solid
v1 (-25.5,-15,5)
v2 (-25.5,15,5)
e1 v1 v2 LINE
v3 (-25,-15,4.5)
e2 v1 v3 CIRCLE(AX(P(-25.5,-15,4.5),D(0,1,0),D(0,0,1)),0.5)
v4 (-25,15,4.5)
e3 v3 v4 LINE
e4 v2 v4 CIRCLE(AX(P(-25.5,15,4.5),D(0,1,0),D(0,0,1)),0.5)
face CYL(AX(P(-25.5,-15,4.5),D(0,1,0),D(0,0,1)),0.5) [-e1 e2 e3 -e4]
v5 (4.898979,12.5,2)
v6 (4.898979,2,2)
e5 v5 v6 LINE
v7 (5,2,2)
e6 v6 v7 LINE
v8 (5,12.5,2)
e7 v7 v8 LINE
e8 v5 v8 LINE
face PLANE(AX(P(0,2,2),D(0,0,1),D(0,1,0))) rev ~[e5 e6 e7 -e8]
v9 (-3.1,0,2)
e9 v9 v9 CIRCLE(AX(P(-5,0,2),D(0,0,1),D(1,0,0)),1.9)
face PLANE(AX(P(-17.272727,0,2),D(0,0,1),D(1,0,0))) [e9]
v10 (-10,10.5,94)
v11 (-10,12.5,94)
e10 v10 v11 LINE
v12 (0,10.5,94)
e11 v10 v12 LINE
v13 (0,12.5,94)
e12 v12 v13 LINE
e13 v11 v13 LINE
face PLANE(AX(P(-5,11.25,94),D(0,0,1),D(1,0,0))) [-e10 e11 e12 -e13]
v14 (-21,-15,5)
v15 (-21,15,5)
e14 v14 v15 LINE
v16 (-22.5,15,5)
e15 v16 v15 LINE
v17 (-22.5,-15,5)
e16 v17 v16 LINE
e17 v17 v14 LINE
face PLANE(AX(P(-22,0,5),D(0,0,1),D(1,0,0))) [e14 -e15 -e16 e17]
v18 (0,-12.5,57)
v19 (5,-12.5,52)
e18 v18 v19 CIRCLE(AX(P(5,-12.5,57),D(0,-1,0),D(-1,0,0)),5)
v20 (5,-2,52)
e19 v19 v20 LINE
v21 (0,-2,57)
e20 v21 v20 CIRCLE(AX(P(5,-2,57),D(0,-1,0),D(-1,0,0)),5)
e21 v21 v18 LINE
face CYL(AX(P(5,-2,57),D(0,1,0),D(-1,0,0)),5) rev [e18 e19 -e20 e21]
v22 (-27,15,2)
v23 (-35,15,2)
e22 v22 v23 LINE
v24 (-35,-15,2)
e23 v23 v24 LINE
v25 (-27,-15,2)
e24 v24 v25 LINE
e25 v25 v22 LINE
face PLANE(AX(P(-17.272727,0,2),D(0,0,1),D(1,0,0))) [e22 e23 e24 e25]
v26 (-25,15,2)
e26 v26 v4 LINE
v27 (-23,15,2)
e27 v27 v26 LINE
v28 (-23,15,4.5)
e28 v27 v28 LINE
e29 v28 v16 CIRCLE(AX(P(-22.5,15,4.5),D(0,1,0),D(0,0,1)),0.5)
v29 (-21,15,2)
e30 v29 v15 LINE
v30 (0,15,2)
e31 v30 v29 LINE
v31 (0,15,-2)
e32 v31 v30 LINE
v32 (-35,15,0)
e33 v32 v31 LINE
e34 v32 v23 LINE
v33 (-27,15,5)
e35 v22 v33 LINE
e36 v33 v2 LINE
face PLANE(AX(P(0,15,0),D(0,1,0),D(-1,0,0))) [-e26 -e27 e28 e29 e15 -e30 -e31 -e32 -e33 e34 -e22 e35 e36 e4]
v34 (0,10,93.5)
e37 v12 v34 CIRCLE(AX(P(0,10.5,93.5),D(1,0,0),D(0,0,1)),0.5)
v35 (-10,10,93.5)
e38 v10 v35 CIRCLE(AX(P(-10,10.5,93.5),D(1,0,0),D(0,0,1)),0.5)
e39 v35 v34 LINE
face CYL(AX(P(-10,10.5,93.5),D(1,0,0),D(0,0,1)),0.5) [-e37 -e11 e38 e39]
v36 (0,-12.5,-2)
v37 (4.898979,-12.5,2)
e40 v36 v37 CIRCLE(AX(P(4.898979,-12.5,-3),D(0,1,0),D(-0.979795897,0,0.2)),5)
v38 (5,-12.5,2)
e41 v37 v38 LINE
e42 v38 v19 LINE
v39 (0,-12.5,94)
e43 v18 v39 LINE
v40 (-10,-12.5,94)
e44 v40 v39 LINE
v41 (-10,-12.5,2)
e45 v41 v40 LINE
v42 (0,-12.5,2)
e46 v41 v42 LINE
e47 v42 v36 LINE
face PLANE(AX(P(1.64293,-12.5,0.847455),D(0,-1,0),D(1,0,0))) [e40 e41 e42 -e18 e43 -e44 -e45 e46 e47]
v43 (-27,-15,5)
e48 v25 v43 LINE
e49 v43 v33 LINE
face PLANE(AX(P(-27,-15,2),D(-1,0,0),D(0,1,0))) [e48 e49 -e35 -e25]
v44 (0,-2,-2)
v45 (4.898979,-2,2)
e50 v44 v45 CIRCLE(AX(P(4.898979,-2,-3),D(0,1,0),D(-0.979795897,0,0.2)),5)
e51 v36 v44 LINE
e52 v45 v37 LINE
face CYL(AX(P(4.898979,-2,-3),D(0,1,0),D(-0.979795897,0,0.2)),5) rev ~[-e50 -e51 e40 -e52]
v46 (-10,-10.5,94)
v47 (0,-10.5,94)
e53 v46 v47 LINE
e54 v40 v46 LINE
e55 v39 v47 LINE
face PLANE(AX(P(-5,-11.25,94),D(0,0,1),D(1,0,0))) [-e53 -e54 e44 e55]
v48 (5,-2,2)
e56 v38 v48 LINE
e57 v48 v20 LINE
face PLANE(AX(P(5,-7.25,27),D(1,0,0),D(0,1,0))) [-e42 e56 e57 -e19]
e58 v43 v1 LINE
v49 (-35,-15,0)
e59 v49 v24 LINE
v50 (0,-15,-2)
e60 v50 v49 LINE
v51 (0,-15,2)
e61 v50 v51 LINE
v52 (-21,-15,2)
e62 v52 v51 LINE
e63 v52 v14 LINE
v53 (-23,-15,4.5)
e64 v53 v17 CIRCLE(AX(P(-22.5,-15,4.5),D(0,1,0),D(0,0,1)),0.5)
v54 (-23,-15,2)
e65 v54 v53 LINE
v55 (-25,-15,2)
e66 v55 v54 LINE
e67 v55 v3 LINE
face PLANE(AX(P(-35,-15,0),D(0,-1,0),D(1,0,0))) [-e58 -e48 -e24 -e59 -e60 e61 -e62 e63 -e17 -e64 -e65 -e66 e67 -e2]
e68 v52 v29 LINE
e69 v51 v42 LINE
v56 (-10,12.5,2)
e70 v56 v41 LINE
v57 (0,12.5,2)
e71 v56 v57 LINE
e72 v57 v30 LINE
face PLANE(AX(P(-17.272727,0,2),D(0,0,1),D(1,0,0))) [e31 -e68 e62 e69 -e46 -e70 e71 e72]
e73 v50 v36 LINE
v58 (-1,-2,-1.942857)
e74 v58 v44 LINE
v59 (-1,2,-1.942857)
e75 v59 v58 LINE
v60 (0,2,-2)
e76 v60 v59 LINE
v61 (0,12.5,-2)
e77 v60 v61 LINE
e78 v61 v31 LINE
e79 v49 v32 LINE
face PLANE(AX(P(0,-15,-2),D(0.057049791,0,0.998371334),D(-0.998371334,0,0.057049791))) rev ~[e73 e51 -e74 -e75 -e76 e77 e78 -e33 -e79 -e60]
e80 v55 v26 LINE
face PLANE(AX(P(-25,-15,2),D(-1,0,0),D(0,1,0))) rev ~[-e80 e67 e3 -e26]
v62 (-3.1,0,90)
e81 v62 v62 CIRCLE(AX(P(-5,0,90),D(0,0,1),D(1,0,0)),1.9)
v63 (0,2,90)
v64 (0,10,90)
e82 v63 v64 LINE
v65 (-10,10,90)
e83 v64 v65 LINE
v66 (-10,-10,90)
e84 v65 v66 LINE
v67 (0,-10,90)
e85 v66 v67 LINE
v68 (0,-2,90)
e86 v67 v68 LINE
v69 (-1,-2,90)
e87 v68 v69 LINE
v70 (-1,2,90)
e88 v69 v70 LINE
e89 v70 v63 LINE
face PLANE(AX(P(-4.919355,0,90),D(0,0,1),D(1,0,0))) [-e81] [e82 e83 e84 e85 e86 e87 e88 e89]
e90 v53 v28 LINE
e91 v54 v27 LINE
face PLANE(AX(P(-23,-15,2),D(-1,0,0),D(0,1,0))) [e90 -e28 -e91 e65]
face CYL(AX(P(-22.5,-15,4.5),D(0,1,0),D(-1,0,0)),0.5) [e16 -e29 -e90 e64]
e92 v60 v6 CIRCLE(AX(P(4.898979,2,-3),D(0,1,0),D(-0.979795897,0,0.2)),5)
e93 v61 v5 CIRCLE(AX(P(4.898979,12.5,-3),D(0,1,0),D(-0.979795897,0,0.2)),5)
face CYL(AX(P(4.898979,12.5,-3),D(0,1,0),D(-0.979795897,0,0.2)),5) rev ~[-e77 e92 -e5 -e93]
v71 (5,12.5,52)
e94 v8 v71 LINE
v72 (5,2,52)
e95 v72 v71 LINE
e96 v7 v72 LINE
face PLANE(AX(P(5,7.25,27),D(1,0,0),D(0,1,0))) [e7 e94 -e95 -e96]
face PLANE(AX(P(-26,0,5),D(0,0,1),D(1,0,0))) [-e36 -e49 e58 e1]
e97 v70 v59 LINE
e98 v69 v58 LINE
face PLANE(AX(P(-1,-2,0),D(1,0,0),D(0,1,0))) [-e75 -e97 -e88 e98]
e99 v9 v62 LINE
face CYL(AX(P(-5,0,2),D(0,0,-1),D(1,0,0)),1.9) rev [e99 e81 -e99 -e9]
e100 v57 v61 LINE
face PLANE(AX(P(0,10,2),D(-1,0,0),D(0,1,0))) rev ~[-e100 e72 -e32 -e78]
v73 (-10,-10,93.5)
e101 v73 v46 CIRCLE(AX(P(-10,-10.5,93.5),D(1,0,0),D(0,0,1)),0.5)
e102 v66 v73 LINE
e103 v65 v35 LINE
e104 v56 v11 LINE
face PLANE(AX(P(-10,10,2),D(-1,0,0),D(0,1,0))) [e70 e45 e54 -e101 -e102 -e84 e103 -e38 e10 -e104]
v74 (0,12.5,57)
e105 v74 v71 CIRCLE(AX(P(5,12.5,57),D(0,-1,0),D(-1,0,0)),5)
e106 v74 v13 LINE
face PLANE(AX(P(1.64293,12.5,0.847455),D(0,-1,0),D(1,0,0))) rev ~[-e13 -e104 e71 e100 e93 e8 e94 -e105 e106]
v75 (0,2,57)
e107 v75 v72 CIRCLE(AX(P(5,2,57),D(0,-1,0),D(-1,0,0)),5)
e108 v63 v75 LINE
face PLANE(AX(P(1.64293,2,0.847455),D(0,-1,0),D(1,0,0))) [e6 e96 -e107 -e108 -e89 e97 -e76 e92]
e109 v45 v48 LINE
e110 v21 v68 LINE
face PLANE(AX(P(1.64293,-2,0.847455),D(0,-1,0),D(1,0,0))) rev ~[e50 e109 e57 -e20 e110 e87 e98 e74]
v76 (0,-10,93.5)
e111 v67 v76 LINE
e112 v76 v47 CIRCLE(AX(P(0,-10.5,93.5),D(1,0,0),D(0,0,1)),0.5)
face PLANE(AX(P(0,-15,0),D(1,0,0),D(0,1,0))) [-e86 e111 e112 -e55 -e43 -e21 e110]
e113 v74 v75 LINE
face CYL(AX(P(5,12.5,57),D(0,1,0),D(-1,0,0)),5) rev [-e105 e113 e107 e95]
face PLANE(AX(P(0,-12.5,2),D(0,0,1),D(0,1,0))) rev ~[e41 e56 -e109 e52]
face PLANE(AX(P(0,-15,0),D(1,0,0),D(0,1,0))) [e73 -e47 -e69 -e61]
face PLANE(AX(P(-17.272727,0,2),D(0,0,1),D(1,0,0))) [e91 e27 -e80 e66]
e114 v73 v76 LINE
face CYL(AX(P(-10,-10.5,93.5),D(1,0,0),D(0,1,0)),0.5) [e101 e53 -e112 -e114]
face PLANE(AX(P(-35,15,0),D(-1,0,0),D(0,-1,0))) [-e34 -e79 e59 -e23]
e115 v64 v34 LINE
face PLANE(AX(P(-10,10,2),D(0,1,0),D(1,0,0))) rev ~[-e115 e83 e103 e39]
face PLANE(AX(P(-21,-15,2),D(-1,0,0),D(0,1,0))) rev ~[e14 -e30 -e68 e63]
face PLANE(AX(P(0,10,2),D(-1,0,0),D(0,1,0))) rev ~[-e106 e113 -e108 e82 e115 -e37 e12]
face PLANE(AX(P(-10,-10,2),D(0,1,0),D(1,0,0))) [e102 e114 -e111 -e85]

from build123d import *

# Parameters (mm, degrees)
F1_DEPTH      = 2
F2_R          = 1.9
F3_DEPTH      = 88
F4_W          = 2
F4_H          = 30
F5_DEPTH      = 3
F6_DEPTH      = 2
F8_DEPTH      = 30.001
F9_W          = 10
F9_H          = 2.5
F10_DEPTH     = 92
F11_R         = 0.5
F12_W         = 10.5
F12_H         = 50
F13_DEPTH     = 5
F14_T1_DEPTH  = 10.5
F14_T3_DEPTH  = 10.5
F14_T8_DEPTH  = 34.9948974279
F14_T13_DEPTH = 34.9948974279
F14_T18_DEPTH = 35.5
F14_T23_DEPTH = 35.5


# Not quite as in the source:
# - a fillet or chamfer that OpenCascade refuses, or shapes differently, is made with other operations: its cross-section is extruded or revolved along the edge and cut away or added


with BuildPart() as f1:
    # F0 (on Top) → F1 (new body)
    with BuildSketch(Plane.XY):
        Polygon((0, 2), (0, 15), (-35, 15), (-35, -15), (0, -15), (0, -2), (-1, -2), (-1, 2), align=None)
    extrude(amount=F1_DEPTH)

    # F2 (on face) → F3 (join)
    with BuildSketch(Plane.XY.offset(2)):
        Polygon((-1, 2), (0, 2), (0, 10), (-10, 10), (-10, -10), (0, -10), (0, -2), (-1, -2), align=None)
        with Locations((-5, 0)):
            Circle(F2_R, mode=Mode.SUBTRACT)
    extrude(amount=F3_DEPTH)

    # F4 (on face) → F5 (join)
    with BuildSketch(Plane.XY.offset(2)):
        with Locations((-26, 0)):
            Rectangle(F4_W, F4_H)
        with Locations((-22, 0)):
            Rectangle(F4_W, F4_H)
    extrude(amount=F5_DEPTH)

    # F6 (add): a face of the model
    f6_faces = [f1.faces().sort_by_distance(p)[0] for p in [
        (-17.5650095602, 0, 0),
    ]]
    extrude(f6_faces, amount=F6_DEPTH)

    # F7 (on face) → F8 (cut, through all)
    with BuildSketch(Plane.XZ.offset(15)):
        Polygon((0, -2), (-35, 0), (-35, -2), align=None)
    extrude(amount=-F8_DEPTH, mode=Mode.SUBTRACT)

    # F9 (on face) → F10 (join)
    with BuildSketch(Plane.XY.offset(2)):
        with Locations((-5, 11.25)):
            Rectangle(F9_W, F9_H)
        with Locations((-5, -11.25)):
            Rectangle(F9_W, F9_H)
    extrude(amount=F10_DEPTH)

    # F11
    f11_edges = [f1.edges().sort_by_distance(p)[0] for p in [
        (-25, 0, 5),
        (-23, 0, 5),
        (-5, 10, 94),
        (-5, -10, 94),
    ]]
    fillet(f11_edges, radius=F11_R)

    # F12 (on face) → F13 (join)
    with BuildSketch(Plane.YZ):
        with Locations((7.25, 27)):
            Rectangle(F12_W, F12_H)
        with Locations((-7.25, 27)):
            Rectangle(F12_W, F12_H)
    extrude(amount=F13_DEPTH)

    # F14: fillet of radius 5 on 4 edges, made by hand

    # F14_s2 → F14_t1 (join)
    with BuildSketch(Plane.XZ.offset(2)):
        with BuildLine():
            ThreePointArc((0, -2), (1.7367018254, 0.8729833462), (4.8989794856, 2))
            Line((4.8989794856, 2), (0, 2))
            Line((0, 2), (0, -2))
        make_face()
        with BuildLine():
            ThreePointArc((0, 57), (1.4644660941, 53.4644660941), (5, 52))
            Line((5, 52), (0, 52))
            Line((0, 52), (0, 57))
        make_face()
    extrude(amount=F14_T1_DEPTH)

    # F14_s4 → F14_t3 (join)
    with BuildSketch(Plane.XZ.offset(-12.5)):
        with BuildLine():
            ThreePointArc((0, -2), (1.7367018254, 0.8729833462), (4.8989794856, 2))
            Line((4.8989794856, 2), (0, 2))
            Line((0, 2), (0, -2))
        make_face()
        with BuildLine():
            ThreePointArc((0, 57), (1.4644660941, 53.4644660941), (5, 52))
            Line((5, 52), (0, 52))
            Line((0, 52), (0, 57))
        make_face()
    extrude(amount=F14_T3_DEPTH)


with BuildPart() as f14_tool6:
    # F14_s7 → F14_t8 (new body)
    with BuildSketch(Plane.XZ.offset(24.7474487139)):
        with BuildLine():
            ThreePointArc((0, -2), (1.7367018254, 0.8729833462), (4.8989794856, 2))
            Line((4.8989794856, 2), (0, 2))
            Line((0, 2), (0, -2))
        make_face()
    extrude(amount=-F14_T8_DEPTH)

    split(bisect_by=Plane.XZ.offset(-2), keep=Keep.BOTTOM)


with BuildPart() as f1_1:
    add(f1.part)

    # F14_t5: union F14_tool6
    add(f14_tool6.part)


with BuildPart() as f14_tool11:
    # F14_s12 → F14_t13 (new body)
    with BuildSketch(Plane.XZ.offset(10.2474487139)):
        with BuildLine():
            ThreePointArc((0, -2), (1.7367018254, 0.8729833462), (4.8989794856, 2))
            Line((4.8989794856, 2), (0, 2))
            Line((0, 2), (0, -2))
        make_face()
    extrude(amount=-F14_T13_DEPTH)

    split(bisect_by=Plane.XZ.offset(2), keep=Keep.TOP)


with BuildPart() as f1_2:
    add(f1_1.part)

    # F14_t10: union F14_tool11
    add(f14_tool11.part)


with BuildPart() as f14_tool16:
    # F14_s17 → F14_t18 (new body)
    with BuildSketch(Plane.XZ.offset(-10.5)):
        with BuildLine():
            ThreePointArc((0, 57), (1.4644660941, 53.4644660941), (5, 52))
            Line((5, 52), (0, 52))
            Line((0, 52), (0, 57))
        make_face()
    extrude(amount=F14_T18_DEPTH)

    split(bisect_by=Plane.XZ.offset(-2), keep=Keep.BOTTOM)


with BuildPart() as f1_3:
    add(f1_2.part)

    # F14_t15: union F14_tool16
    add(f14_tool16.part)


with BuildPart() as f14_tool21:
    # F14_s22 → F14_t23 (new body)
    with BuildSketch(Plane.XZ.offset(-25)):
        with BuildLine():
            ThreePointArc((0, 57), (1.4644660941, 53.4644660941), (5, 52))
            Line((5, 52), (0, 52))
            Line((0, 52), (0, 57))
        make_face()
    extrude(amount=F14_T23_DEPTH)

    split(bisect_by=Plane.XZ.offset(2), keep=Keep.TOP)


with BuildPart() as f1_4:
    add(f1_3.part)

    # F14_t20: union F14_tool21
    add(f14_tool21.part)


solid = f1_4.part
